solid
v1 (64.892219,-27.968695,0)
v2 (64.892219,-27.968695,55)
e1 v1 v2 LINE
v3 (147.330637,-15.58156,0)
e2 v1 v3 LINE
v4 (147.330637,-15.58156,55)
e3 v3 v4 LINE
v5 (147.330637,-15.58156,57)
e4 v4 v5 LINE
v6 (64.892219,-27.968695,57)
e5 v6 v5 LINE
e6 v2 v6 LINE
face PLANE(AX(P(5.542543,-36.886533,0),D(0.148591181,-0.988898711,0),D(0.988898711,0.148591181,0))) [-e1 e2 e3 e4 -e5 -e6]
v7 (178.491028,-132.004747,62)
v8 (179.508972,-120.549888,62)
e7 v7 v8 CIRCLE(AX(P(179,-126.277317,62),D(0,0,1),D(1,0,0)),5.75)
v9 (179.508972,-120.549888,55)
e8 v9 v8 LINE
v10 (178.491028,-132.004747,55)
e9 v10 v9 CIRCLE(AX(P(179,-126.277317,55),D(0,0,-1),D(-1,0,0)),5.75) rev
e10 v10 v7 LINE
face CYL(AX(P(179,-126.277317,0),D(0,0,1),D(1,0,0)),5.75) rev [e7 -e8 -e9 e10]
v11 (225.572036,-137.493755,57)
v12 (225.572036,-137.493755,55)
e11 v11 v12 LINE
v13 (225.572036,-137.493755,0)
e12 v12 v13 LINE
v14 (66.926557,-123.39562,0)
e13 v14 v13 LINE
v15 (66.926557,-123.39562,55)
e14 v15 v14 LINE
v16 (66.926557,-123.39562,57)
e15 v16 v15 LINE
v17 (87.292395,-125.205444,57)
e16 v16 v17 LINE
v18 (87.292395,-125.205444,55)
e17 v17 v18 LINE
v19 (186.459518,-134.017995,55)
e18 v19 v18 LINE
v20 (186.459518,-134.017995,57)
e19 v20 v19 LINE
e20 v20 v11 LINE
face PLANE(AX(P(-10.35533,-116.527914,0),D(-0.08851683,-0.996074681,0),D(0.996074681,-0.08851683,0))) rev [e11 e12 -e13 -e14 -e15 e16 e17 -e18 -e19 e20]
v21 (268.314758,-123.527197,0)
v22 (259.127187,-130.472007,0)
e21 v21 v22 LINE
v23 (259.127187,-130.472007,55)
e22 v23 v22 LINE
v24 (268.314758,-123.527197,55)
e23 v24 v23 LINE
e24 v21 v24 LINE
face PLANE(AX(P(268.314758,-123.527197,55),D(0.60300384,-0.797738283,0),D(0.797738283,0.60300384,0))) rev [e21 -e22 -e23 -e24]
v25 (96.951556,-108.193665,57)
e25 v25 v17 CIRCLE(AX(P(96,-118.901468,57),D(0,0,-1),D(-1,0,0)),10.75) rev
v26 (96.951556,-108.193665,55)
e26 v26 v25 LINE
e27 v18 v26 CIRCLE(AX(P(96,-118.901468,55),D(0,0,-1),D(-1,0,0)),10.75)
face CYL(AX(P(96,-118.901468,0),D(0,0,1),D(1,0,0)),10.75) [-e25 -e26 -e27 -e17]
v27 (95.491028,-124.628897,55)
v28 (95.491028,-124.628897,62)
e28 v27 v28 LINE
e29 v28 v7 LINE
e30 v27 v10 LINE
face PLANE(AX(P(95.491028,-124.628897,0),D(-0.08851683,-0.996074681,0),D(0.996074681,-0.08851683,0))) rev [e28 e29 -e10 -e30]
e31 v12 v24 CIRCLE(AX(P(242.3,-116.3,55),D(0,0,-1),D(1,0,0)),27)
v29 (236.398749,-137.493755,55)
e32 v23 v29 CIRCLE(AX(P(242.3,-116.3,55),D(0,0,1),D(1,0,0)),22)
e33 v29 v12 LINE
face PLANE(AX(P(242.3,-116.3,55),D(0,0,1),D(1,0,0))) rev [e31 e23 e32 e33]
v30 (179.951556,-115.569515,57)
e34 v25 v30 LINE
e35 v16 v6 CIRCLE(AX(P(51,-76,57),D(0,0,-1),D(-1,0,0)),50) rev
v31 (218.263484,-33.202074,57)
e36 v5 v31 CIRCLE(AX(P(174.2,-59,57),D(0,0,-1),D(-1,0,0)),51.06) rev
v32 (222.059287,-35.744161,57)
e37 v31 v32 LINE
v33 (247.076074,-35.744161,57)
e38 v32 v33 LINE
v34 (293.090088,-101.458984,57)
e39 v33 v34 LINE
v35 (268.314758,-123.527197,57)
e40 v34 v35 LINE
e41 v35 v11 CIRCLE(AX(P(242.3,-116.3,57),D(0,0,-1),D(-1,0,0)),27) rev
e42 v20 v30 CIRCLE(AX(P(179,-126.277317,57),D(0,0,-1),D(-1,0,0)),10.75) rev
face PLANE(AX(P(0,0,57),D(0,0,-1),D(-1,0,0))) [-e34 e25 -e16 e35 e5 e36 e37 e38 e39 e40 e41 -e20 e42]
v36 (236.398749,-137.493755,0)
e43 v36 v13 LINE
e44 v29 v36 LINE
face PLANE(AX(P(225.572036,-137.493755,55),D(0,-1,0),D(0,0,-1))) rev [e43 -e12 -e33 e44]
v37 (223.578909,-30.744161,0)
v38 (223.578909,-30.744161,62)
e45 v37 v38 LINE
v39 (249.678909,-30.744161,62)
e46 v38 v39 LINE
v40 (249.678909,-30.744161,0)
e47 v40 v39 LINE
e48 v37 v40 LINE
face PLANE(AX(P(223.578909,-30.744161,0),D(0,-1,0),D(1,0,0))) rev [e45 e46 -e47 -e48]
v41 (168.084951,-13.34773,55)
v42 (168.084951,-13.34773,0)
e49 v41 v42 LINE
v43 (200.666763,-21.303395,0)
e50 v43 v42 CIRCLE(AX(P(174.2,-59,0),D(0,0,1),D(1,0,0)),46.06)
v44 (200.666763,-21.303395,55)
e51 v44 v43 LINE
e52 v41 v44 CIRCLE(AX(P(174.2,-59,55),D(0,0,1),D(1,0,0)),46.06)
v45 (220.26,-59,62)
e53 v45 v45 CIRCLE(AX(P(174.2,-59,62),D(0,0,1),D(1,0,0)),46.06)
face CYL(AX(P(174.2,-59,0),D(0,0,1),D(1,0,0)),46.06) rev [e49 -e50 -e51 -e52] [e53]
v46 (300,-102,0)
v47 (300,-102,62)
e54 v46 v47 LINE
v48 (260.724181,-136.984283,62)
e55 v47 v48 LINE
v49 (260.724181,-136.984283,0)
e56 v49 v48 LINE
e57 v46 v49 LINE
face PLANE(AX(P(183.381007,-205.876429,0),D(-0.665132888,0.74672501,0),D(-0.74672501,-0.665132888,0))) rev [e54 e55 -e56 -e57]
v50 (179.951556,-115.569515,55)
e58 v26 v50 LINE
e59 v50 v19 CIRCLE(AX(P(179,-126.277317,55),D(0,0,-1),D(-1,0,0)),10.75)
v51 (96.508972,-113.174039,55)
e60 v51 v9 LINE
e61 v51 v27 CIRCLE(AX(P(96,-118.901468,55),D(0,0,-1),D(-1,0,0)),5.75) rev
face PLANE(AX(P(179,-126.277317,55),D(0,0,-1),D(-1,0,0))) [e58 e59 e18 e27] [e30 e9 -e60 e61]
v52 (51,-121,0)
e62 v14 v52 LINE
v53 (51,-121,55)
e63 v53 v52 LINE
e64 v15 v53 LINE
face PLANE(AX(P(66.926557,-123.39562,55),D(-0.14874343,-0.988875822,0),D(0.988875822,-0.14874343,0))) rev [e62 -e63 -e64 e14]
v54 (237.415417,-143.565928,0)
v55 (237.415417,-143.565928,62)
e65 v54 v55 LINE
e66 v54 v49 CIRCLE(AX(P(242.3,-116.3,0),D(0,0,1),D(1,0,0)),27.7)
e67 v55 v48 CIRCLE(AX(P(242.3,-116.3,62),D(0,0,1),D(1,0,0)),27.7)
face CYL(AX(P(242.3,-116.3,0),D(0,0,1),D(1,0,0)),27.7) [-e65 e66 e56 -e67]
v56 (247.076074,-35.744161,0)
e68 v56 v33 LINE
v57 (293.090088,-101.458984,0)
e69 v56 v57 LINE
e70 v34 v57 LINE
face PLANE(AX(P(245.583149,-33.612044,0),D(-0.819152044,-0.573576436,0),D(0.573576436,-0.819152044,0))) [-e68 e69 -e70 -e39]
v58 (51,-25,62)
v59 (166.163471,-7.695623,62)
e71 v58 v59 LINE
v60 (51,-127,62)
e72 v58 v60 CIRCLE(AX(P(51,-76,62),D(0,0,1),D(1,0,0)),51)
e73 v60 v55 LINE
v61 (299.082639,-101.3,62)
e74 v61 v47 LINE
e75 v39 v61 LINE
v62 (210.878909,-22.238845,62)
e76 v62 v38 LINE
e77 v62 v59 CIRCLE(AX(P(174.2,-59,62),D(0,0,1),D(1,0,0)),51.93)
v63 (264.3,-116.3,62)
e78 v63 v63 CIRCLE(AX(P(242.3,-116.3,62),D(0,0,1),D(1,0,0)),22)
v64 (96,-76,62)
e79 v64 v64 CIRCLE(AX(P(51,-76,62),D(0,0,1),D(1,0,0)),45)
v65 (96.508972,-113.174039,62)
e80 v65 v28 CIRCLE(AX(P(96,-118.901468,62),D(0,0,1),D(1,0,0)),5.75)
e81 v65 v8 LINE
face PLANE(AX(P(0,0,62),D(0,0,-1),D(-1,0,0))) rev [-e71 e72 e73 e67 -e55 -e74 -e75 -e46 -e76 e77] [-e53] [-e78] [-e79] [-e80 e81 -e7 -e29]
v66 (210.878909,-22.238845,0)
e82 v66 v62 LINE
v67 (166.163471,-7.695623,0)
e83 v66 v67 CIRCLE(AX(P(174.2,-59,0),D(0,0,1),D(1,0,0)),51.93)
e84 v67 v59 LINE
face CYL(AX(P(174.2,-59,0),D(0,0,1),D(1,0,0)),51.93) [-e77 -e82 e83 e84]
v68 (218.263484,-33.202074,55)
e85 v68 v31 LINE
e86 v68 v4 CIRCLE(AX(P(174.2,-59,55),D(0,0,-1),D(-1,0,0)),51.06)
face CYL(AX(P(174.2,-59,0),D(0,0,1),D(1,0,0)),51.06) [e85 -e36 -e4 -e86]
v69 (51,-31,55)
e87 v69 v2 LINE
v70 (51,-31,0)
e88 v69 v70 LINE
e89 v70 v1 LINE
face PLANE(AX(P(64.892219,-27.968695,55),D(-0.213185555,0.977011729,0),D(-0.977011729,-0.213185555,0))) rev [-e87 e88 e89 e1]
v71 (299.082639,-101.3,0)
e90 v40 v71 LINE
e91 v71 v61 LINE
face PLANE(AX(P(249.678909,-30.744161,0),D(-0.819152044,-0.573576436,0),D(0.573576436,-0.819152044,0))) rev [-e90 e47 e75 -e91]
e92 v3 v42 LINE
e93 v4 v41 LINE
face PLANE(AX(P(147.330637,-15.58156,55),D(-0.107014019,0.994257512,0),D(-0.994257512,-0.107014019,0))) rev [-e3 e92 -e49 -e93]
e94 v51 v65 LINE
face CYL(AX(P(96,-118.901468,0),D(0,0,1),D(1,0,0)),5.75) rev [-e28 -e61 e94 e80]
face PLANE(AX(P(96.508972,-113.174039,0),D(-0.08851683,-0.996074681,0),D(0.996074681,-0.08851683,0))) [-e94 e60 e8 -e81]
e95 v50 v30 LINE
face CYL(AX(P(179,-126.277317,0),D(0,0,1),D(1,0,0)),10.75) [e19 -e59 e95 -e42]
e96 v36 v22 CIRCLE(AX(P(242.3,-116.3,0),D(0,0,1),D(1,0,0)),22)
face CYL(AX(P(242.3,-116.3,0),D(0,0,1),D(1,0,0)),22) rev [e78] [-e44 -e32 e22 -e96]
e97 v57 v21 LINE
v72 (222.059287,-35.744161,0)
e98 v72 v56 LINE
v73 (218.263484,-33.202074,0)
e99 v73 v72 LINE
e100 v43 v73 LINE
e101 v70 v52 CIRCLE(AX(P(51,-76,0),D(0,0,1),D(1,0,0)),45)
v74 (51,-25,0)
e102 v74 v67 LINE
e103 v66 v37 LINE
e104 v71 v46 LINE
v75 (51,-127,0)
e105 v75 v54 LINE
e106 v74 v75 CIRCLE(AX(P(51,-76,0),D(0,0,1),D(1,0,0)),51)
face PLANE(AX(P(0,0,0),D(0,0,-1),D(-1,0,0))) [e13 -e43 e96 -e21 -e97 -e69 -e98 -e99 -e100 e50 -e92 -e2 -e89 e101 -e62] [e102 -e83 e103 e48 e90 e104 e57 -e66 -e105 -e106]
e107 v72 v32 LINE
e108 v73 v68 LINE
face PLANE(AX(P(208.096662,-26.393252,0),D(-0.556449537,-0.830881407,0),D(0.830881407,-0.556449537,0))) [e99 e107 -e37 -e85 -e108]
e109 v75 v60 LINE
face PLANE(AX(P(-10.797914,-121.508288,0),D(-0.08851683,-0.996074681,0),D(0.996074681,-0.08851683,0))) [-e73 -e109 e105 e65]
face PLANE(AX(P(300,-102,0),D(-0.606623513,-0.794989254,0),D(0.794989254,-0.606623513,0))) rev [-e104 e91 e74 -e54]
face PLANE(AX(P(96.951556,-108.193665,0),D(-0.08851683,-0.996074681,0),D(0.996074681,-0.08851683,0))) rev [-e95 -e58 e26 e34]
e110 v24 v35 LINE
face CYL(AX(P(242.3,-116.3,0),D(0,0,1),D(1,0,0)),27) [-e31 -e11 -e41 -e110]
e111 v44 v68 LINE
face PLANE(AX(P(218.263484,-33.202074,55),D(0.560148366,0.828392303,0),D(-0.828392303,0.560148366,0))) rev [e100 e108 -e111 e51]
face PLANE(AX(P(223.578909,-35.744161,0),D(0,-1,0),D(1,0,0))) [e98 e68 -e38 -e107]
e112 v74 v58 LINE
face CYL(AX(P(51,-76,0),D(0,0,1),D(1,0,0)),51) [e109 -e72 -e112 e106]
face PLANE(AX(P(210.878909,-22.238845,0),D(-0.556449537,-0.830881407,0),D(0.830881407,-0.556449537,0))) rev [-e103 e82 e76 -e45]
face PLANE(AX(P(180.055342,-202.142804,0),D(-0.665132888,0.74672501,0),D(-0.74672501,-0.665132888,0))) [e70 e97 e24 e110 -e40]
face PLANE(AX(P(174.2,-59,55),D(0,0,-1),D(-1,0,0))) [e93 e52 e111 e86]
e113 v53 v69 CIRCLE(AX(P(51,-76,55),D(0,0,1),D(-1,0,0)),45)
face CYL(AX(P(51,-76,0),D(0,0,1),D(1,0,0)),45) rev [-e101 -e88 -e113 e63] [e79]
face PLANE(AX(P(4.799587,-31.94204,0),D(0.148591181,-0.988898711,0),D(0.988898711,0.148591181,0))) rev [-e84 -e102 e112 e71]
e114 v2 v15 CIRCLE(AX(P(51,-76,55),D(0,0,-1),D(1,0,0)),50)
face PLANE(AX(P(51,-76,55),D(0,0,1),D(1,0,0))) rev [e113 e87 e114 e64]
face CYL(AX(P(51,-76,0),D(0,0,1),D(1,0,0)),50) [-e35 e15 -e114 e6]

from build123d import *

# Parameters (mm, degrees)
SKETCH1_W           = 300
SKETCH1_H           = 152
BOSS_EXTRUDE1_DEPTH = 62
CUT_EXTRUDE2_DEPTH  = 342.976607387
SKETCH7_R           = 45
SKETCH7_R_2         = 46.06
SKETCH7_R_3         = 22
CUT_EXTRUDE4_DEPTH  = 339.496676498
CUT_EXTRUDE6_DEPTH  = 339.496676498
CUT_EXTRUDE9_DEPTH  = 339.496676498
SHELL2_DEPTH        = 57
CUT_EXTRUDE10_DEPTH = 55


# Read off the part's stored shape, not the designer's step: Shell2
with BuildPart() as part:
    # Sketch1 → Boss-Extrude1 (new body)
    with BuildSketch(Plane.XY):
        with Locations((150, -76)):
            Rectangle(SKETCH1_W, SKETCH1_H)
    extrude(amount=BOSS_EXTRUDE1_DEPTH)

    # Sketch2 → Cut-Extrude2 (cut, through all)
    with BuildSketch(Plane.XY.offset(62)):
        with BuildLine():
            ThreePointArc((51, -127), (14.937554126, -112.062445807), (0, -75.999999905))
            Line((0, -75.999999905), (0, -152))
            Line((0, -152), (300, -152))
            Line((300, -152), (300, -102))
            Line((300, -102), (260.724181003, -136.984282786))
            ThreePointArc((260.724181003, -136.984282786), (252.157366961, -142.186720854), (242.3, -144))
            ThreePointArc((242.3, -144), (239.848083808, -143.891268673), (237.415416722, -143.565928303))
            Line((237.415416722, -143.565928303), (51, -127))
        make_face()
        with BuildLine():
            ThreePointArc((0, -75.999999905), (14.937554193, -39.937554126), (51, -25))
            Line((51, -25), (166.163471247, -7.695622939))
            ThreePointArc((166.163471247, -7.695622939), (190.26153232, -9.61627718), (210.878909402, -22.238845161))
            Line((210.878909402, -22.238845161), (251.946068796, -20.152501272))
            Line((251.946068796, -20.152501272), (300, -102))
            Line((300, -102), (300, 0))
            Line((300, 0), (0, 0))
            Line((0, 0), (0, -75.999999905))
        make_face()
    extrude(amount=-CUT_EXTRUDE2_DEPTH, mode=Mode.SUBTRACT)

    # Sketch7 → Cut-Extrude4 (cut, through all)
    with BuildSketch(Plane.XY.offset(62)):
        with Locations((51, -76)):
            Circle(SKETCH7_R)
        with Locations((174.2, -59)):
            Circle(SKETCH7_R_2)
        with Locations((242.3, -116.3)):
            Circle(SKETCH7_R_3)
    extrude(amount=-CUT_EXTRUDE4_DEPTH, mode=Mode.SUBTRACT)

    # Sketch6 → Cut-Extrude6 (cut, through all)
    with BuildSketch(Plane.XY.offset(62)):
        with BuildLine():
            Line((95.491028227, -124.62889745), (178.491028227, -132.004746901))
            ThreePointArc((178.491028227, -132.004746901), (184.727429418, -126.786289256), (179.508971773, -120.549888066))
            Line((179.508971773, -120.549888066), (96.508971773, -113.174038615))
            ThreePointArc((96.508971773, -113.174038615), (90.272570582, -118.39249626), (95.491028227, -124.62889745))
        make_face()
    extrude(amount=-CUT_EXTRUDE6_DEPTH, mode=Mode.SUBTRACT)

    # Sketch10 → Cut-Extrude9 (cut, through all)
    with BuildSketch(Plane.XY.offset(62)):
        Polygon((210.878909402, -22.238845161), (223.578909402, -30.744161401), (249.678909402, -30.744161401), (299.082639453, -101.3), (300, -102), (251.946068796, -20.152501272), align=None)
    extrude(amount=-CUT_EXTRUDE9_DEPTH, mode=Mode.SUBTRACT)

    # Shell2 outline → Shell2 (cut)
    with BuildSketch(Plane.XY):
        with BuildLine():
            ThreePointArc((179.951555923, -115.569514659), (189.137709243, -122.70109723), (186.459518175, -134.017995012))
            Line((186.459518175, -134.017995012), (225.572036413, -137.493754604))
            ThreePointArc((225.572036413, -137.493754604), (233.913861687, -90.635380692), (268.314757677, -123.52719745))
            Line((268.314757677, -123.52719745), (293.090088132, -101.458983754))
            Line((293.090088132, -101.458983754), (247.076074149, -35.744161401))
            Line((247.076074149, -35.744161401), (222.05928739, -35.744161401))
            Line((222.05928739, -35.744161401), (218.263483983, -33.202074129))
            ThreePointArc((218.263483983, -33.202074129), (161.890244674, -108.553945593), (147.330636825, -15.581560109))
            Line((147.330636825, -15.581560109), (64.89221906, -27.968695108))
            ThreePointArc((64.89221906, -27.968695108), (100.988642148, -74.934328279), (66.926556679, -123.39561997))
            Line((66.926556679, -123.39561997), (87.292394522, -125.205443511))
            ThreePointArc((87.292394522, -125.205443511), (86.651779504, -113.593617849), (96.951555923, -108.193665208))
            Line((96.951555923, -108.193665208), (179.951555923, -115.569514659))
        make_face()
    extrude(amount=SHELL2_DEPTH, mode=Mode.SUBTRACT)

    # Sketch12 → Cut-Extrude10 (cut)
    with BuildSketch(Plane(origin=(0, 0, 0), x_dir=(-1, 0, 0), z_dir=(0, 0, -1))):
        with BuildLine():
            Line((-64.89221906, -27.968695108), (-51, -31))
            ThreePointArc((-51, -31), (-96, -76), (-51, -121))
            Line((-51, -121), (-66.926556679, -123.39561997))
            ThreePointArc((-66.926556679, -123.39561997), (-100.988642148, -74.934328279), (-64.89221906, -27.968695108))
        make_face()
        with BuildLine():
            Line((-268.314757677, -123.52719745), (-259.127186744, -130.472007137))
            ThreePointArc((-259.127186744, -130.472007137), (-235.806137419, -95.280253361), (-236.398748795, -137.493754604))
            Line((-236.398748795, -137.493754604), (-225.572036413, -137.493754604))
            ThreePointArc((-225.572036413, -137.493754604), (-233.913861687, -90.635380692), (-268.314757677, -123.52719745))
        make_face()
        with BuildLine():
            Line((-186.459518175, -134.017995012), (-87.292394522, -125.205443511))
            ThreePointArc((-87.292394522, -125.205443511), (-86.651779504, -113.593617849), (-96.951555923, -108.193665208))
            Line((-96.951555923, -108.193665208), (-179.951555923, -115.569514659))
            ThreePointArc((-179.951555923, -115.569514659), (-189.137709243, -122.70109723), (-186.459518175, -134.017995012))
        make_face()
        with BuildLine():
            Line((-218.263483983, -33.202074129), (-200.666763454, -21.30339495))
            ThreePointArc((-200.666763454, -21.30339495), (-163.274286328, -103.745417428), (-168.084950709, -13.347729825))
            Line((-168.084950709, -13.347729825), (-147.330636825, -15.581560109))
            ThreePointArc((-147.330636825, -15.581560109), (-161.890244675, -108.553945593), (-218.263483983, -33.202074129))
        make_face()
    extrude(amount=-CUT_EXTRUDE10_DEPTH, mode=Mode.SUBTRACT)


solid = part.part
